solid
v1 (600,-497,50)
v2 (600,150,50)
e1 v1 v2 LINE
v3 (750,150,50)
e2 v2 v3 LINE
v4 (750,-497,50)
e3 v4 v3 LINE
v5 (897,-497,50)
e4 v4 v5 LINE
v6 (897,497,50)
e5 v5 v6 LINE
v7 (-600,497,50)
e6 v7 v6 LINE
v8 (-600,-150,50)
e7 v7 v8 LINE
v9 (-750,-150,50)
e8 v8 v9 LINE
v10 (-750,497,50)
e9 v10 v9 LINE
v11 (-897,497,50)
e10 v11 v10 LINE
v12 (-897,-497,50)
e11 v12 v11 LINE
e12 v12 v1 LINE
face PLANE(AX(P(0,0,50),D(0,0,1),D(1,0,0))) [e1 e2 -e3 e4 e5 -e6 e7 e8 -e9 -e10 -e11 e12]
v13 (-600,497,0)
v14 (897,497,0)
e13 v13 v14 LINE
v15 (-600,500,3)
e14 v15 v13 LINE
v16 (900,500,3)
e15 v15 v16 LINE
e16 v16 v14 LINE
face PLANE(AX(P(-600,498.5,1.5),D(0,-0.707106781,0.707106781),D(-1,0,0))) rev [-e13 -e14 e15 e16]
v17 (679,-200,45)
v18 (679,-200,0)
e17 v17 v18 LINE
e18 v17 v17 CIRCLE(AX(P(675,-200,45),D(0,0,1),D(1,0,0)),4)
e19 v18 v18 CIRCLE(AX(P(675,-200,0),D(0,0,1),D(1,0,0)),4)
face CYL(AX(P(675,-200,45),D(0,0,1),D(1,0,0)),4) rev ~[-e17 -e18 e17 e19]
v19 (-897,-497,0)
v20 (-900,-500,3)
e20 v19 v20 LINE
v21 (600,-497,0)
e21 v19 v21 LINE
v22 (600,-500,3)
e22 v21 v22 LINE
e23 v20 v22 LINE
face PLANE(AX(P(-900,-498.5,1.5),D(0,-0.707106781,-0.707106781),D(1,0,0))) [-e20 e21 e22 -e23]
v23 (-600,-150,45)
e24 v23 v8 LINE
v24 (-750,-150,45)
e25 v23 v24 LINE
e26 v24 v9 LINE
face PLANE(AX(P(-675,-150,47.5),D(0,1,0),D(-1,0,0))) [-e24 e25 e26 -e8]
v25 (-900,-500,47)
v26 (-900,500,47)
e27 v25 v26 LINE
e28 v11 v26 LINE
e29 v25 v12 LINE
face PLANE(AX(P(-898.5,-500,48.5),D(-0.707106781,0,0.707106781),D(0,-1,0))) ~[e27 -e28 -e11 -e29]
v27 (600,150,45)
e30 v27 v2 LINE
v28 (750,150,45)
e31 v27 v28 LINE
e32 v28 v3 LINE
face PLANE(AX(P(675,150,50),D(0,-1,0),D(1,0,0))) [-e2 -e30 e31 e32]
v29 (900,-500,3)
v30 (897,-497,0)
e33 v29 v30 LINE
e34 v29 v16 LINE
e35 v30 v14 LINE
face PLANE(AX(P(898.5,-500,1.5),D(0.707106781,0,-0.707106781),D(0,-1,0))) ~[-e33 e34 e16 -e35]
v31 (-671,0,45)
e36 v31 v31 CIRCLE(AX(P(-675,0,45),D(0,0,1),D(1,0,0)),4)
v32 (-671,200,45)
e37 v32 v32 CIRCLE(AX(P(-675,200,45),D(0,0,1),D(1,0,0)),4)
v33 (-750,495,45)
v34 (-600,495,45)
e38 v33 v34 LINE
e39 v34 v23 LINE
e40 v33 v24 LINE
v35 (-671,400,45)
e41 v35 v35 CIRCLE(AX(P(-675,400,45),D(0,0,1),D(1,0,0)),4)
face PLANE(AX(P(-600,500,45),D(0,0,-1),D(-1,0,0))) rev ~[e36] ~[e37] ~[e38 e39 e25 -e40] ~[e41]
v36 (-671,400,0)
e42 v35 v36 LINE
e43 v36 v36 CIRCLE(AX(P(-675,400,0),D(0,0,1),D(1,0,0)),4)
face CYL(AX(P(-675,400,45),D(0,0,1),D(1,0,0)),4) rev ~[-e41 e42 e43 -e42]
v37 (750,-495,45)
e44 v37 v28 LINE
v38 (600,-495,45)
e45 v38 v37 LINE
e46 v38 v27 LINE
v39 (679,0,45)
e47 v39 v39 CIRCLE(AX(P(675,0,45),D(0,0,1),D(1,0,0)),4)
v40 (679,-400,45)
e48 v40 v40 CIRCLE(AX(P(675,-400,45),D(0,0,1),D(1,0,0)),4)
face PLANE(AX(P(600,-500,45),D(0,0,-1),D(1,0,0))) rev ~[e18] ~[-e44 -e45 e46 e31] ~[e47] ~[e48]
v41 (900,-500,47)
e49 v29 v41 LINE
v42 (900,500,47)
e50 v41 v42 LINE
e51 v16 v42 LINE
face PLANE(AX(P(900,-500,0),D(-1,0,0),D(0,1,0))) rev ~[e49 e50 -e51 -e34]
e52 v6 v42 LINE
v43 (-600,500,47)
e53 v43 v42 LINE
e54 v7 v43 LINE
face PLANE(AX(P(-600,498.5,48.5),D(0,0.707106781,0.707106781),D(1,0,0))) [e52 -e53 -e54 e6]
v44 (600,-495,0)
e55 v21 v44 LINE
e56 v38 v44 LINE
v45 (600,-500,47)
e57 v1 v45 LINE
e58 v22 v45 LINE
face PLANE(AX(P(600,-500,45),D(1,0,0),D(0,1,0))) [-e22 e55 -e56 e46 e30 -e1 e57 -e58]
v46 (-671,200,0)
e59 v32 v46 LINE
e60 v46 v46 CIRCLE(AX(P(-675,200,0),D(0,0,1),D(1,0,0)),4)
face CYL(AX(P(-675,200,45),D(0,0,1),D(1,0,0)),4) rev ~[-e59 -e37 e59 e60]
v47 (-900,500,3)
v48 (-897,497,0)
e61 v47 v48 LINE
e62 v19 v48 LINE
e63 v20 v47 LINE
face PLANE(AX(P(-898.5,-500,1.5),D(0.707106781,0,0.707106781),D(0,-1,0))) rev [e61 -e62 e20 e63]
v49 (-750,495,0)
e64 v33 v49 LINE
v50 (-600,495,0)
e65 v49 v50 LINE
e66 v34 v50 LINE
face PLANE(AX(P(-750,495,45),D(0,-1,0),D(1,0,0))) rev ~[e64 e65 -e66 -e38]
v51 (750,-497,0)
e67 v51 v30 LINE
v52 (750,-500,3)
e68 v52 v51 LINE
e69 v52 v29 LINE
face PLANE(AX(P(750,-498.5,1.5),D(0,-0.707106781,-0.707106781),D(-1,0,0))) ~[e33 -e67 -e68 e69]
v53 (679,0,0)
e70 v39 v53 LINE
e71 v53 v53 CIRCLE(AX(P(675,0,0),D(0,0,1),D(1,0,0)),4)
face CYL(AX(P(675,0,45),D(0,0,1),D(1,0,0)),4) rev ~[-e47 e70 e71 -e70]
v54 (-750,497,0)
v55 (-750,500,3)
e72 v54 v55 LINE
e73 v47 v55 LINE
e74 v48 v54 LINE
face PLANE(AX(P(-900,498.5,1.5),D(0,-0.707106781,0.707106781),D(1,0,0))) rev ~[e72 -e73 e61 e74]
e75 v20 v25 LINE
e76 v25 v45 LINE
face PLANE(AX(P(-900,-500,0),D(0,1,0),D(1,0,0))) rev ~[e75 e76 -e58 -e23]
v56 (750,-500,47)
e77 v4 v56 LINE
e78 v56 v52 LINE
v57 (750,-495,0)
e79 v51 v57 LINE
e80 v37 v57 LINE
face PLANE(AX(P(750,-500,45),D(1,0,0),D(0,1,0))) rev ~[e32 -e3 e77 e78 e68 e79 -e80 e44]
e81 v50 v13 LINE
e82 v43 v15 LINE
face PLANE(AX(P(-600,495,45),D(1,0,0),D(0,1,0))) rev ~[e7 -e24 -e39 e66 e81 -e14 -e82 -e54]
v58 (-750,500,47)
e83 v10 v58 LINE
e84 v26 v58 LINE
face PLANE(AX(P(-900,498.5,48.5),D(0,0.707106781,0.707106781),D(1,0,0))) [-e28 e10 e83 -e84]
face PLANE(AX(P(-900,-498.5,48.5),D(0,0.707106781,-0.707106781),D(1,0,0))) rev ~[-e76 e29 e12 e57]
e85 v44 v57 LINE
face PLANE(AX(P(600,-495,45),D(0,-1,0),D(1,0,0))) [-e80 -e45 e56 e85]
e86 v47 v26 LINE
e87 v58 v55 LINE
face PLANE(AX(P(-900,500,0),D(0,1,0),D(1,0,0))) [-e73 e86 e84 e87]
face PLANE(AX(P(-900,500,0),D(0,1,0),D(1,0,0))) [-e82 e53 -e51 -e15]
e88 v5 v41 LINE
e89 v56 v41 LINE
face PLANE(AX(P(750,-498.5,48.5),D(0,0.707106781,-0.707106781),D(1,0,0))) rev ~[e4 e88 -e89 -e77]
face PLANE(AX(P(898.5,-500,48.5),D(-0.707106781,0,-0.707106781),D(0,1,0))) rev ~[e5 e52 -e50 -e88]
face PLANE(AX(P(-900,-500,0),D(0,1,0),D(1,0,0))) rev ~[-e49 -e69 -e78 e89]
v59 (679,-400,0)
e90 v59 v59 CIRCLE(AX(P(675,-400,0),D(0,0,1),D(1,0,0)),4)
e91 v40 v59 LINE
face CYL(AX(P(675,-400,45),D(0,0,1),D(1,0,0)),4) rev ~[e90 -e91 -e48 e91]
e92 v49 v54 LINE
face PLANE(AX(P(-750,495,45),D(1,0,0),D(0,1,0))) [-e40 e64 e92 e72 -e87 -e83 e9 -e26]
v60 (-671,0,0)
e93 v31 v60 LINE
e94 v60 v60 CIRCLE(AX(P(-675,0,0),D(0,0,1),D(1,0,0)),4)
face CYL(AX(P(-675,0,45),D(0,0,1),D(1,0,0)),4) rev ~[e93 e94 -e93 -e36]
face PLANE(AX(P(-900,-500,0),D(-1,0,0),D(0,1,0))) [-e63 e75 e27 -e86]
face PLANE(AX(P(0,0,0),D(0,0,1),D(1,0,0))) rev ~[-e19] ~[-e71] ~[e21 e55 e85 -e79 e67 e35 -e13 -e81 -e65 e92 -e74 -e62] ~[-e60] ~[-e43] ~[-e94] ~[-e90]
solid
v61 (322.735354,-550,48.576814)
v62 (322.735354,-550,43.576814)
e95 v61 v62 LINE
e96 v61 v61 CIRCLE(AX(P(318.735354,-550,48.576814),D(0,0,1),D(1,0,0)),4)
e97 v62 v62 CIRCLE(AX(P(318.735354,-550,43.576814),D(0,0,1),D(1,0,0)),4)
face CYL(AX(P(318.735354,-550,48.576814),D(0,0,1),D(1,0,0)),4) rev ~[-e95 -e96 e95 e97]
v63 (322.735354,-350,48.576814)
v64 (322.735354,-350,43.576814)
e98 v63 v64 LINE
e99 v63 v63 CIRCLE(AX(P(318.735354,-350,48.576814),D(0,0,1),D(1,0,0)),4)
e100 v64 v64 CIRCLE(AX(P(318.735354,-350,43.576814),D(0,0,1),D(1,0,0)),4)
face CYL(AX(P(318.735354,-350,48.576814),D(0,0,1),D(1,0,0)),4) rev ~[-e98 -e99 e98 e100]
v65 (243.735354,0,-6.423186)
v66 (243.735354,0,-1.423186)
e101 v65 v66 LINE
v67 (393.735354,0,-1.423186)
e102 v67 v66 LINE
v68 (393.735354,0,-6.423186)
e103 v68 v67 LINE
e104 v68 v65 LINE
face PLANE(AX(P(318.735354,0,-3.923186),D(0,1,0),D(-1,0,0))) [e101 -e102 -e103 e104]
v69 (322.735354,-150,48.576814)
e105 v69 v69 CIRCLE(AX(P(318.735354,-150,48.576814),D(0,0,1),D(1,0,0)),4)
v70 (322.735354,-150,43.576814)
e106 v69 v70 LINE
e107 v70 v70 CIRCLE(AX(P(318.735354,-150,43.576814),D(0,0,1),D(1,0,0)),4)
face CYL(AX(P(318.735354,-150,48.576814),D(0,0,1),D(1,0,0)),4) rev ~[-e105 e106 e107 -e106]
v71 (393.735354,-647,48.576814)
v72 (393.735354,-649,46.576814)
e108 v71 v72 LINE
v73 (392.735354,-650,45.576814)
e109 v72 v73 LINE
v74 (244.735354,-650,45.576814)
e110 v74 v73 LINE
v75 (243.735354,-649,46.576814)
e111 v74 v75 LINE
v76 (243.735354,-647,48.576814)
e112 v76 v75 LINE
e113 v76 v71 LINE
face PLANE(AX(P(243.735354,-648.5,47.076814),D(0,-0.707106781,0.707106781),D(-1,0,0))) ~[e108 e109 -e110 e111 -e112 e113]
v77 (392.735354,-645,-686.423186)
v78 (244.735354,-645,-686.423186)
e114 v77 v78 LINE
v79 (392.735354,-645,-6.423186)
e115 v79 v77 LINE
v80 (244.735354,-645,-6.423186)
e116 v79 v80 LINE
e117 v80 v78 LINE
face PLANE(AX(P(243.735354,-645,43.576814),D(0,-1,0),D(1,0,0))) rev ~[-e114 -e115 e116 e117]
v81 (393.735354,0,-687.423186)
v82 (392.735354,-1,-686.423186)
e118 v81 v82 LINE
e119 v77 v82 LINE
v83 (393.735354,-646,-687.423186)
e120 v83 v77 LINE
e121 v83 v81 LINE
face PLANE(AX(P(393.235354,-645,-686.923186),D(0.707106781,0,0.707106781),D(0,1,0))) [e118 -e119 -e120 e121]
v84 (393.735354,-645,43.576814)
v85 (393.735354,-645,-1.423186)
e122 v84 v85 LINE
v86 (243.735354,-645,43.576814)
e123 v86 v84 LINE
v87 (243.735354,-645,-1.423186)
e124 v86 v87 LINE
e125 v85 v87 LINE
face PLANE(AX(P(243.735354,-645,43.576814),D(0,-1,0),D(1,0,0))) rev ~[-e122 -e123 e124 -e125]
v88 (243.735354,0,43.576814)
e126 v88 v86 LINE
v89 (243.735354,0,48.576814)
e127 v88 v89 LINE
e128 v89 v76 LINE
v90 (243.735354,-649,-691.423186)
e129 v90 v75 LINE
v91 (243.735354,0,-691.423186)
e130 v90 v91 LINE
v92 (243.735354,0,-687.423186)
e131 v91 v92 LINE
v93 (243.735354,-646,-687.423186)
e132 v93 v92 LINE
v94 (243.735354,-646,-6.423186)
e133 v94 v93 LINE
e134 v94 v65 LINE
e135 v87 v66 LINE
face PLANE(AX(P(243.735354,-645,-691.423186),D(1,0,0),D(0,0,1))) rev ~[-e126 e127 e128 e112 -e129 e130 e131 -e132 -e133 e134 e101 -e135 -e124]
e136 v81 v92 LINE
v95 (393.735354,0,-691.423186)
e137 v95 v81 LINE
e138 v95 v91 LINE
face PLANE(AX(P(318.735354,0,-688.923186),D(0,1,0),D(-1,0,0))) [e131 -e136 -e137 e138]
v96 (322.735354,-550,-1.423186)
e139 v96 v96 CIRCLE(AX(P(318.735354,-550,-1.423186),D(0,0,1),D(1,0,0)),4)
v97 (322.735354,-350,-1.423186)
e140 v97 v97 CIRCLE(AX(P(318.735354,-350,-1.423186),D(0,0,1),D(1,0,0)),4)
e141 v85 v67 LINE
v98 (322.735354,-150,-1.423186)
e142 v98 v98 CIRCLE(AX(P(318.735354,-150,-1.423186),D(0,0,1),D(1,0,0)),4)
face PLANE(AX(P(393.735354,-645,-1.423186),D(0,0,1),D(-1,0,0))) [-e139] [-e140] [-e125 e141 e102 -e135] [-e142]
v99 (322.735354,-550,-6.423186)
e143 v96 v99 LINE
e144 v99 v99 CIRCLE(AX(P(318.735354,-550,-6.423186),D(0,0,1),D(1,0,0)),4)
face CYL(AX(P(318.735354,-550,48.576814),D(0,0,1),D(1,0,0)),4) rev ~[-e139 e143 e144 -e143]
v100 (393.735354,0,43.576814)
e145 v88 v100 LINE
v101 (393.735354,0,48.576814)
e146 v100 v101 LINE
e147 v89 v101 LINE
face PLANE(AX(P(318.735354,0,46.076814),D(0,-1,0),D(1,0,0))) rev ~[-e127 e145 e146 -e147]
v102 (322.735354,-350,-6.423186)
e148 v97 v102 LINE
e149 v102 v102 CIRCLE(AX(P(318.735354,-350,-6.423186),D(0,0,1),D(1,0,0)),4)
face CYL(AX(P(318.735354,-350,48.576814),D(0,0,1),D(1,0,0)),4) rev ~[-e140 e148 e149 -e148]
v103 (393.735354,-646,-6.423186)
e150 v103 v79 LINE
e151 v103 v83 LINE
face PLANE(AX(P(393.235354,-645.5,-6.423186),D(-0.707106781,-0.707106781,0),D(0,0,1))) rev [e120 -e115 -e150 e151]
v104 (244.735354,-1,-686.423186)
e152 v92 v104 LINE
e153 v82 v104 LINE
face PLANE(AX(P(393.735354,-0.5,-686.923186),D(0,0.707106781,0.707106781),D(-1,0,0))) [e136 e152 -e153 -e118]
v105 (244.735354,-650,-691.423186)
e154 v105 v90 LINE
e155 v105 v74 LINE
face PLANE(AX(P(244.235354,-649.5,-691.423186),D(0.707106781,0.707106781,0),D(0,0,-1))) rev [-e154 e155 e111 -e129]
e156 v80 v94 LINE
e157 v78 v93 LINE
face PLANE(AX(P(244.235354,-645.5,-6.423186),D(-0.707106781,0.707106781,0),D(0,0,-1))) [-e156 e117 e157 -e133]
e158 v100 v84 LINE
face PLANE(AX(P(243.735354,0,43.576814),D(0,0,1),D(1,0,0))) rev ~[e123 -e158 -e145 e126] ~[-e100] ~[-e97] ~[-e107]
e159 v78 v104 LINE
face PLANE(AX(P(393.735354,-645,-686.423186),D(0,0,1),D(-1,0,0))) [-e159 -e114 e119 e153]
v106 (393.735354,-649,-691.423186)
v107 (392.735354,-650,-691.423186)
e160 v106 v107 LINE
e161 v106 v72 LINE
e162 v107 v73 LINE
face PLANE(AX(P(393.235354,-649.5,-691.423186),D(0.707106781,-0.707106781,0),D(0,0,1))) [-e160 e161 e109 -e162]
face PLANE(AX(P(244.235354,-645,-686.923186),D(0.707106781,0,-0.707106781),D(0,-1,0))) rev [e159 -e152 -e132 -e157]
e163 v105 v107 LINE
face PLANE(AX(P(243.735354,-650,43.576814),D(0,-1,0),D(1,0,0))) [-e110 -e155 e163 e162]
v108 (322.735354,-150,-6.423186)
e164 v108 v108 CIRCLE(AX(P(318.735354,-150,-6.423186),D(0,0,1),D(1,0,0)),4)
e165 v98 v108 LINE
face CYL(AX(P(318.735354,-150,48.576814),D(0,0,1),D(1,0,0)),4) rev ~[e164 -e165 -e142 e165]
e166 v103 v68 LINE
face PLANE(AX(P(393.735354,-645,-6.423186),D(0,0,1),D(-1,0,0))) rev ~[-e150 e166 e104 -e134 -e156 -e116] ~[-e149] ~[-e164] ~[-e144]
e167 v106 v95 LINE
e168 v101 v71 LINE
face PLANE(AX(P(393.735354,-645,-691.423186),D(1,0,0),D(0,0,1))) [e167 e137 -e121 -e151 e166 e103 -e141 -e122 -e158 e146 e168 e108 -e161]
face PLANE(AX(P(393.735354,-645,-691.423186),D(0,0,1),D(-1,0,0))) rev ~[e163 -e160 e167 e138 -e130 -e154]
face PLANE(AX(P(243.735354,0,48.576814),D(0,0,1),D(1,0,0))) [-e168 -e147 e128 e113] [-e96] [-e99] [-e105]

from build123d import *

# Parameters (mm, degrees)
F0_W      = 1800
F0_H      = 1000
F1_DEPTH  = 50
F2_W      = 150
F2_H      = 10
F3_DEPTH  = 650
F4_W      = 150
F4_H      = 5
F5_DEPTH  = 650
F6_R      = 4
F7_DEPTH  = 50
F8_W      = 150
F8_H      = 5
F9_DEPTH  = 650
F10_W     = 150
F10_H     = 5
F11_DEPTH = 735
F12_W     = 150
F12_H     = 5
F13_DEPTH = 645
F14_W     = 150
F14_H     = 5
F15_DEPTH = 645
F16_R     = 4
F17_DEPTH = 80
F18_W     = 150
F18_H     = 5
F19_DEPTH = 100
F20_W     = 150
F20_H     = 5
F21_DEPTH = 100
F22_SIZE  = 3
F23_SIZE  = 3
F24_SIZE  = 1


with BuildPart() as f1:
    # F0 (on Top) → F1 (new body)
    with BuildSketch(Plane.XY):
        Rectangle(F0_W, F0_H)
    extrude(amount=F1_DEPTH)

    # F2 (on face) → F3 (cut)
    with BuildSketch(Plane.XZ.offset(500)):
        with Locations((675, 50)):
            Rectangle(F2_W, F2_H)
    extrude(amount=-F3_DEPTH, mode=Mode.SUBTRACT)

    # F4 (on face) → F5 (cut)
    with BuildSketch(Plane(origin=(0, 500, 0), x_dir=(-1, 0, 0), z_dir=(0, 1, 0))):
        with Locations((675, 47.5)):
            Rectangle(F4_W, F4_H)
    extrude(amount=-F5_DEPTH, mode=Mode.SUBTRACT)

    # F6 (on face) → F7 (cut)
    with BuildSketch(Plane.XY.offset(45)):
        with Locations((675, 0)):
            Circle(F6_R)
        with Locations((675, -200)):
            Circle(F6_R)
        with Locations((675, -400)):
            Circle(F6_R)
        with Locations((-675, 400)):
            Circle(F6_R)
        with Locations((-675, 200)):
            Circle(F6_R)
        with Locations((-675, 0)):
            Circle(F6_R)
    extrude(amount=-F7_DEPTH, mode=Mode.SUBTRACT)

    # F18 (on face) → F19 (cut)
    with BuildSketch(Plane.XY.offset(45)):
        with Locations((675, -497.5)):
            Rectangle(F18_W, F18_H)
    extrude(amount=-F19_DEPTH, mode=Mode.SUBTRACT)

    # F20 (on face) → F21 (cut)
    with BuildSketch(Plane.XY.offset(45)):
        with Locations((-675, 497.5)):
            Rectangle(F20_W, F20_H)
    extrude(amount=-F21_DEPTH, mode=Mode.SUBTRACT)

    # F22
    f22_edges = [f1.edges().sort_by_distance(p)[0] for p in [
        (150, 500, 50),
        (-825, 500, 50),
        (-900, 0, 50),
        (-150, -500, 50),
        (825, -500, 50),
        (825, -500, 0),
        (-150, -500, 0),
        (-900, 0, 0),
        (-825, 500, 0),
        (150, 500, 0),
        (900, 0, 50),
        (900, 0, 0),
    ]]
    chamfer(f22_edges, length=F22_SIZE)


with BuildPart() as f9:
    # F8 (on Front) → F9 (new body)
    with BuildSketch(Plane.XZ):
        with Locations((318.7353536487, 46.0768144429)):
            Rectangle(F8_W, F8_H)
    extrude(amount=F9_DEPTH)

    # F10 (on face) → F11 (join)
    with BuildSketch(Plane(origin=(0, 0, 43.5768144429), x_dir=(1, 0, 0), z_dir=(0, 0, -1))):
        with Locations((318.7353536487, 647.5)):
            Rectangle(F10_W, F10_H)
    extrude(amount=F11_DEPTH)

    # F12 (on face) → F13 (join)
    with BuildSketch(Plane(origin=(0, -645, 0), x_dir=(-1, 0, 0), z_dir=(0, 1, 0))):
        with Locations((-318.7353536487, -688.9231855571)):
            Rectangle(F12_W, F12_H)
    extrude(amount=F13_DEPTH)

    # F14 (on face) → F15 (join)
    with BuildSketch(Plane(origin=(0, -645, 0), x_dir=(-1, 0, 0), z_dir=(0, 1, 0))):
        with Locations((-318.7353536487, -3.9231855571)):
            Rectangle(F14_W, F14_H)
    extrude(amount=F15_DEPTH)

    # F16 (on face) → F17 (cut)
    with BuildSketch(Plane.XY.offset(48.5768144429)):
        with Locations((318.7353536487, -150)):
            Circle(F16_R)
        with Locations((318.7353536487, -350)):
            Circle(F16_R)
        with Locations((318.7353536487, -550)):
            Circle(F16_R)
    extrude(amount=-F17_DEPTH, mode=Mode.SUBTRACT)

    # F23
    f23_edges = [f9.edges().sort_by_distance(p)[0] for p in [
        (318.735354, -650, 48.576814),
    ]]
    chamfer(f23_edges, length=F23_SIZE)

    # F24
    f24_edges = [f9.edges().sort_by_distance(p)[0] for p in [
        (393.735354, -650, -322.923186),
        (243.735354, -650, -322.923186),
        (243.735354, -645, -346.423186),
        (393.735354, -645, -346.423186),
        (318.735354, 0, -686.423186),
        (393.735354, -322.5, -686.423186),
        (243.735354, -322.5, -686.423186),
    ]]
    chamfer(f24_edges, length=F24_SIZE)


solid = Compound([f1.part, f9.part])
